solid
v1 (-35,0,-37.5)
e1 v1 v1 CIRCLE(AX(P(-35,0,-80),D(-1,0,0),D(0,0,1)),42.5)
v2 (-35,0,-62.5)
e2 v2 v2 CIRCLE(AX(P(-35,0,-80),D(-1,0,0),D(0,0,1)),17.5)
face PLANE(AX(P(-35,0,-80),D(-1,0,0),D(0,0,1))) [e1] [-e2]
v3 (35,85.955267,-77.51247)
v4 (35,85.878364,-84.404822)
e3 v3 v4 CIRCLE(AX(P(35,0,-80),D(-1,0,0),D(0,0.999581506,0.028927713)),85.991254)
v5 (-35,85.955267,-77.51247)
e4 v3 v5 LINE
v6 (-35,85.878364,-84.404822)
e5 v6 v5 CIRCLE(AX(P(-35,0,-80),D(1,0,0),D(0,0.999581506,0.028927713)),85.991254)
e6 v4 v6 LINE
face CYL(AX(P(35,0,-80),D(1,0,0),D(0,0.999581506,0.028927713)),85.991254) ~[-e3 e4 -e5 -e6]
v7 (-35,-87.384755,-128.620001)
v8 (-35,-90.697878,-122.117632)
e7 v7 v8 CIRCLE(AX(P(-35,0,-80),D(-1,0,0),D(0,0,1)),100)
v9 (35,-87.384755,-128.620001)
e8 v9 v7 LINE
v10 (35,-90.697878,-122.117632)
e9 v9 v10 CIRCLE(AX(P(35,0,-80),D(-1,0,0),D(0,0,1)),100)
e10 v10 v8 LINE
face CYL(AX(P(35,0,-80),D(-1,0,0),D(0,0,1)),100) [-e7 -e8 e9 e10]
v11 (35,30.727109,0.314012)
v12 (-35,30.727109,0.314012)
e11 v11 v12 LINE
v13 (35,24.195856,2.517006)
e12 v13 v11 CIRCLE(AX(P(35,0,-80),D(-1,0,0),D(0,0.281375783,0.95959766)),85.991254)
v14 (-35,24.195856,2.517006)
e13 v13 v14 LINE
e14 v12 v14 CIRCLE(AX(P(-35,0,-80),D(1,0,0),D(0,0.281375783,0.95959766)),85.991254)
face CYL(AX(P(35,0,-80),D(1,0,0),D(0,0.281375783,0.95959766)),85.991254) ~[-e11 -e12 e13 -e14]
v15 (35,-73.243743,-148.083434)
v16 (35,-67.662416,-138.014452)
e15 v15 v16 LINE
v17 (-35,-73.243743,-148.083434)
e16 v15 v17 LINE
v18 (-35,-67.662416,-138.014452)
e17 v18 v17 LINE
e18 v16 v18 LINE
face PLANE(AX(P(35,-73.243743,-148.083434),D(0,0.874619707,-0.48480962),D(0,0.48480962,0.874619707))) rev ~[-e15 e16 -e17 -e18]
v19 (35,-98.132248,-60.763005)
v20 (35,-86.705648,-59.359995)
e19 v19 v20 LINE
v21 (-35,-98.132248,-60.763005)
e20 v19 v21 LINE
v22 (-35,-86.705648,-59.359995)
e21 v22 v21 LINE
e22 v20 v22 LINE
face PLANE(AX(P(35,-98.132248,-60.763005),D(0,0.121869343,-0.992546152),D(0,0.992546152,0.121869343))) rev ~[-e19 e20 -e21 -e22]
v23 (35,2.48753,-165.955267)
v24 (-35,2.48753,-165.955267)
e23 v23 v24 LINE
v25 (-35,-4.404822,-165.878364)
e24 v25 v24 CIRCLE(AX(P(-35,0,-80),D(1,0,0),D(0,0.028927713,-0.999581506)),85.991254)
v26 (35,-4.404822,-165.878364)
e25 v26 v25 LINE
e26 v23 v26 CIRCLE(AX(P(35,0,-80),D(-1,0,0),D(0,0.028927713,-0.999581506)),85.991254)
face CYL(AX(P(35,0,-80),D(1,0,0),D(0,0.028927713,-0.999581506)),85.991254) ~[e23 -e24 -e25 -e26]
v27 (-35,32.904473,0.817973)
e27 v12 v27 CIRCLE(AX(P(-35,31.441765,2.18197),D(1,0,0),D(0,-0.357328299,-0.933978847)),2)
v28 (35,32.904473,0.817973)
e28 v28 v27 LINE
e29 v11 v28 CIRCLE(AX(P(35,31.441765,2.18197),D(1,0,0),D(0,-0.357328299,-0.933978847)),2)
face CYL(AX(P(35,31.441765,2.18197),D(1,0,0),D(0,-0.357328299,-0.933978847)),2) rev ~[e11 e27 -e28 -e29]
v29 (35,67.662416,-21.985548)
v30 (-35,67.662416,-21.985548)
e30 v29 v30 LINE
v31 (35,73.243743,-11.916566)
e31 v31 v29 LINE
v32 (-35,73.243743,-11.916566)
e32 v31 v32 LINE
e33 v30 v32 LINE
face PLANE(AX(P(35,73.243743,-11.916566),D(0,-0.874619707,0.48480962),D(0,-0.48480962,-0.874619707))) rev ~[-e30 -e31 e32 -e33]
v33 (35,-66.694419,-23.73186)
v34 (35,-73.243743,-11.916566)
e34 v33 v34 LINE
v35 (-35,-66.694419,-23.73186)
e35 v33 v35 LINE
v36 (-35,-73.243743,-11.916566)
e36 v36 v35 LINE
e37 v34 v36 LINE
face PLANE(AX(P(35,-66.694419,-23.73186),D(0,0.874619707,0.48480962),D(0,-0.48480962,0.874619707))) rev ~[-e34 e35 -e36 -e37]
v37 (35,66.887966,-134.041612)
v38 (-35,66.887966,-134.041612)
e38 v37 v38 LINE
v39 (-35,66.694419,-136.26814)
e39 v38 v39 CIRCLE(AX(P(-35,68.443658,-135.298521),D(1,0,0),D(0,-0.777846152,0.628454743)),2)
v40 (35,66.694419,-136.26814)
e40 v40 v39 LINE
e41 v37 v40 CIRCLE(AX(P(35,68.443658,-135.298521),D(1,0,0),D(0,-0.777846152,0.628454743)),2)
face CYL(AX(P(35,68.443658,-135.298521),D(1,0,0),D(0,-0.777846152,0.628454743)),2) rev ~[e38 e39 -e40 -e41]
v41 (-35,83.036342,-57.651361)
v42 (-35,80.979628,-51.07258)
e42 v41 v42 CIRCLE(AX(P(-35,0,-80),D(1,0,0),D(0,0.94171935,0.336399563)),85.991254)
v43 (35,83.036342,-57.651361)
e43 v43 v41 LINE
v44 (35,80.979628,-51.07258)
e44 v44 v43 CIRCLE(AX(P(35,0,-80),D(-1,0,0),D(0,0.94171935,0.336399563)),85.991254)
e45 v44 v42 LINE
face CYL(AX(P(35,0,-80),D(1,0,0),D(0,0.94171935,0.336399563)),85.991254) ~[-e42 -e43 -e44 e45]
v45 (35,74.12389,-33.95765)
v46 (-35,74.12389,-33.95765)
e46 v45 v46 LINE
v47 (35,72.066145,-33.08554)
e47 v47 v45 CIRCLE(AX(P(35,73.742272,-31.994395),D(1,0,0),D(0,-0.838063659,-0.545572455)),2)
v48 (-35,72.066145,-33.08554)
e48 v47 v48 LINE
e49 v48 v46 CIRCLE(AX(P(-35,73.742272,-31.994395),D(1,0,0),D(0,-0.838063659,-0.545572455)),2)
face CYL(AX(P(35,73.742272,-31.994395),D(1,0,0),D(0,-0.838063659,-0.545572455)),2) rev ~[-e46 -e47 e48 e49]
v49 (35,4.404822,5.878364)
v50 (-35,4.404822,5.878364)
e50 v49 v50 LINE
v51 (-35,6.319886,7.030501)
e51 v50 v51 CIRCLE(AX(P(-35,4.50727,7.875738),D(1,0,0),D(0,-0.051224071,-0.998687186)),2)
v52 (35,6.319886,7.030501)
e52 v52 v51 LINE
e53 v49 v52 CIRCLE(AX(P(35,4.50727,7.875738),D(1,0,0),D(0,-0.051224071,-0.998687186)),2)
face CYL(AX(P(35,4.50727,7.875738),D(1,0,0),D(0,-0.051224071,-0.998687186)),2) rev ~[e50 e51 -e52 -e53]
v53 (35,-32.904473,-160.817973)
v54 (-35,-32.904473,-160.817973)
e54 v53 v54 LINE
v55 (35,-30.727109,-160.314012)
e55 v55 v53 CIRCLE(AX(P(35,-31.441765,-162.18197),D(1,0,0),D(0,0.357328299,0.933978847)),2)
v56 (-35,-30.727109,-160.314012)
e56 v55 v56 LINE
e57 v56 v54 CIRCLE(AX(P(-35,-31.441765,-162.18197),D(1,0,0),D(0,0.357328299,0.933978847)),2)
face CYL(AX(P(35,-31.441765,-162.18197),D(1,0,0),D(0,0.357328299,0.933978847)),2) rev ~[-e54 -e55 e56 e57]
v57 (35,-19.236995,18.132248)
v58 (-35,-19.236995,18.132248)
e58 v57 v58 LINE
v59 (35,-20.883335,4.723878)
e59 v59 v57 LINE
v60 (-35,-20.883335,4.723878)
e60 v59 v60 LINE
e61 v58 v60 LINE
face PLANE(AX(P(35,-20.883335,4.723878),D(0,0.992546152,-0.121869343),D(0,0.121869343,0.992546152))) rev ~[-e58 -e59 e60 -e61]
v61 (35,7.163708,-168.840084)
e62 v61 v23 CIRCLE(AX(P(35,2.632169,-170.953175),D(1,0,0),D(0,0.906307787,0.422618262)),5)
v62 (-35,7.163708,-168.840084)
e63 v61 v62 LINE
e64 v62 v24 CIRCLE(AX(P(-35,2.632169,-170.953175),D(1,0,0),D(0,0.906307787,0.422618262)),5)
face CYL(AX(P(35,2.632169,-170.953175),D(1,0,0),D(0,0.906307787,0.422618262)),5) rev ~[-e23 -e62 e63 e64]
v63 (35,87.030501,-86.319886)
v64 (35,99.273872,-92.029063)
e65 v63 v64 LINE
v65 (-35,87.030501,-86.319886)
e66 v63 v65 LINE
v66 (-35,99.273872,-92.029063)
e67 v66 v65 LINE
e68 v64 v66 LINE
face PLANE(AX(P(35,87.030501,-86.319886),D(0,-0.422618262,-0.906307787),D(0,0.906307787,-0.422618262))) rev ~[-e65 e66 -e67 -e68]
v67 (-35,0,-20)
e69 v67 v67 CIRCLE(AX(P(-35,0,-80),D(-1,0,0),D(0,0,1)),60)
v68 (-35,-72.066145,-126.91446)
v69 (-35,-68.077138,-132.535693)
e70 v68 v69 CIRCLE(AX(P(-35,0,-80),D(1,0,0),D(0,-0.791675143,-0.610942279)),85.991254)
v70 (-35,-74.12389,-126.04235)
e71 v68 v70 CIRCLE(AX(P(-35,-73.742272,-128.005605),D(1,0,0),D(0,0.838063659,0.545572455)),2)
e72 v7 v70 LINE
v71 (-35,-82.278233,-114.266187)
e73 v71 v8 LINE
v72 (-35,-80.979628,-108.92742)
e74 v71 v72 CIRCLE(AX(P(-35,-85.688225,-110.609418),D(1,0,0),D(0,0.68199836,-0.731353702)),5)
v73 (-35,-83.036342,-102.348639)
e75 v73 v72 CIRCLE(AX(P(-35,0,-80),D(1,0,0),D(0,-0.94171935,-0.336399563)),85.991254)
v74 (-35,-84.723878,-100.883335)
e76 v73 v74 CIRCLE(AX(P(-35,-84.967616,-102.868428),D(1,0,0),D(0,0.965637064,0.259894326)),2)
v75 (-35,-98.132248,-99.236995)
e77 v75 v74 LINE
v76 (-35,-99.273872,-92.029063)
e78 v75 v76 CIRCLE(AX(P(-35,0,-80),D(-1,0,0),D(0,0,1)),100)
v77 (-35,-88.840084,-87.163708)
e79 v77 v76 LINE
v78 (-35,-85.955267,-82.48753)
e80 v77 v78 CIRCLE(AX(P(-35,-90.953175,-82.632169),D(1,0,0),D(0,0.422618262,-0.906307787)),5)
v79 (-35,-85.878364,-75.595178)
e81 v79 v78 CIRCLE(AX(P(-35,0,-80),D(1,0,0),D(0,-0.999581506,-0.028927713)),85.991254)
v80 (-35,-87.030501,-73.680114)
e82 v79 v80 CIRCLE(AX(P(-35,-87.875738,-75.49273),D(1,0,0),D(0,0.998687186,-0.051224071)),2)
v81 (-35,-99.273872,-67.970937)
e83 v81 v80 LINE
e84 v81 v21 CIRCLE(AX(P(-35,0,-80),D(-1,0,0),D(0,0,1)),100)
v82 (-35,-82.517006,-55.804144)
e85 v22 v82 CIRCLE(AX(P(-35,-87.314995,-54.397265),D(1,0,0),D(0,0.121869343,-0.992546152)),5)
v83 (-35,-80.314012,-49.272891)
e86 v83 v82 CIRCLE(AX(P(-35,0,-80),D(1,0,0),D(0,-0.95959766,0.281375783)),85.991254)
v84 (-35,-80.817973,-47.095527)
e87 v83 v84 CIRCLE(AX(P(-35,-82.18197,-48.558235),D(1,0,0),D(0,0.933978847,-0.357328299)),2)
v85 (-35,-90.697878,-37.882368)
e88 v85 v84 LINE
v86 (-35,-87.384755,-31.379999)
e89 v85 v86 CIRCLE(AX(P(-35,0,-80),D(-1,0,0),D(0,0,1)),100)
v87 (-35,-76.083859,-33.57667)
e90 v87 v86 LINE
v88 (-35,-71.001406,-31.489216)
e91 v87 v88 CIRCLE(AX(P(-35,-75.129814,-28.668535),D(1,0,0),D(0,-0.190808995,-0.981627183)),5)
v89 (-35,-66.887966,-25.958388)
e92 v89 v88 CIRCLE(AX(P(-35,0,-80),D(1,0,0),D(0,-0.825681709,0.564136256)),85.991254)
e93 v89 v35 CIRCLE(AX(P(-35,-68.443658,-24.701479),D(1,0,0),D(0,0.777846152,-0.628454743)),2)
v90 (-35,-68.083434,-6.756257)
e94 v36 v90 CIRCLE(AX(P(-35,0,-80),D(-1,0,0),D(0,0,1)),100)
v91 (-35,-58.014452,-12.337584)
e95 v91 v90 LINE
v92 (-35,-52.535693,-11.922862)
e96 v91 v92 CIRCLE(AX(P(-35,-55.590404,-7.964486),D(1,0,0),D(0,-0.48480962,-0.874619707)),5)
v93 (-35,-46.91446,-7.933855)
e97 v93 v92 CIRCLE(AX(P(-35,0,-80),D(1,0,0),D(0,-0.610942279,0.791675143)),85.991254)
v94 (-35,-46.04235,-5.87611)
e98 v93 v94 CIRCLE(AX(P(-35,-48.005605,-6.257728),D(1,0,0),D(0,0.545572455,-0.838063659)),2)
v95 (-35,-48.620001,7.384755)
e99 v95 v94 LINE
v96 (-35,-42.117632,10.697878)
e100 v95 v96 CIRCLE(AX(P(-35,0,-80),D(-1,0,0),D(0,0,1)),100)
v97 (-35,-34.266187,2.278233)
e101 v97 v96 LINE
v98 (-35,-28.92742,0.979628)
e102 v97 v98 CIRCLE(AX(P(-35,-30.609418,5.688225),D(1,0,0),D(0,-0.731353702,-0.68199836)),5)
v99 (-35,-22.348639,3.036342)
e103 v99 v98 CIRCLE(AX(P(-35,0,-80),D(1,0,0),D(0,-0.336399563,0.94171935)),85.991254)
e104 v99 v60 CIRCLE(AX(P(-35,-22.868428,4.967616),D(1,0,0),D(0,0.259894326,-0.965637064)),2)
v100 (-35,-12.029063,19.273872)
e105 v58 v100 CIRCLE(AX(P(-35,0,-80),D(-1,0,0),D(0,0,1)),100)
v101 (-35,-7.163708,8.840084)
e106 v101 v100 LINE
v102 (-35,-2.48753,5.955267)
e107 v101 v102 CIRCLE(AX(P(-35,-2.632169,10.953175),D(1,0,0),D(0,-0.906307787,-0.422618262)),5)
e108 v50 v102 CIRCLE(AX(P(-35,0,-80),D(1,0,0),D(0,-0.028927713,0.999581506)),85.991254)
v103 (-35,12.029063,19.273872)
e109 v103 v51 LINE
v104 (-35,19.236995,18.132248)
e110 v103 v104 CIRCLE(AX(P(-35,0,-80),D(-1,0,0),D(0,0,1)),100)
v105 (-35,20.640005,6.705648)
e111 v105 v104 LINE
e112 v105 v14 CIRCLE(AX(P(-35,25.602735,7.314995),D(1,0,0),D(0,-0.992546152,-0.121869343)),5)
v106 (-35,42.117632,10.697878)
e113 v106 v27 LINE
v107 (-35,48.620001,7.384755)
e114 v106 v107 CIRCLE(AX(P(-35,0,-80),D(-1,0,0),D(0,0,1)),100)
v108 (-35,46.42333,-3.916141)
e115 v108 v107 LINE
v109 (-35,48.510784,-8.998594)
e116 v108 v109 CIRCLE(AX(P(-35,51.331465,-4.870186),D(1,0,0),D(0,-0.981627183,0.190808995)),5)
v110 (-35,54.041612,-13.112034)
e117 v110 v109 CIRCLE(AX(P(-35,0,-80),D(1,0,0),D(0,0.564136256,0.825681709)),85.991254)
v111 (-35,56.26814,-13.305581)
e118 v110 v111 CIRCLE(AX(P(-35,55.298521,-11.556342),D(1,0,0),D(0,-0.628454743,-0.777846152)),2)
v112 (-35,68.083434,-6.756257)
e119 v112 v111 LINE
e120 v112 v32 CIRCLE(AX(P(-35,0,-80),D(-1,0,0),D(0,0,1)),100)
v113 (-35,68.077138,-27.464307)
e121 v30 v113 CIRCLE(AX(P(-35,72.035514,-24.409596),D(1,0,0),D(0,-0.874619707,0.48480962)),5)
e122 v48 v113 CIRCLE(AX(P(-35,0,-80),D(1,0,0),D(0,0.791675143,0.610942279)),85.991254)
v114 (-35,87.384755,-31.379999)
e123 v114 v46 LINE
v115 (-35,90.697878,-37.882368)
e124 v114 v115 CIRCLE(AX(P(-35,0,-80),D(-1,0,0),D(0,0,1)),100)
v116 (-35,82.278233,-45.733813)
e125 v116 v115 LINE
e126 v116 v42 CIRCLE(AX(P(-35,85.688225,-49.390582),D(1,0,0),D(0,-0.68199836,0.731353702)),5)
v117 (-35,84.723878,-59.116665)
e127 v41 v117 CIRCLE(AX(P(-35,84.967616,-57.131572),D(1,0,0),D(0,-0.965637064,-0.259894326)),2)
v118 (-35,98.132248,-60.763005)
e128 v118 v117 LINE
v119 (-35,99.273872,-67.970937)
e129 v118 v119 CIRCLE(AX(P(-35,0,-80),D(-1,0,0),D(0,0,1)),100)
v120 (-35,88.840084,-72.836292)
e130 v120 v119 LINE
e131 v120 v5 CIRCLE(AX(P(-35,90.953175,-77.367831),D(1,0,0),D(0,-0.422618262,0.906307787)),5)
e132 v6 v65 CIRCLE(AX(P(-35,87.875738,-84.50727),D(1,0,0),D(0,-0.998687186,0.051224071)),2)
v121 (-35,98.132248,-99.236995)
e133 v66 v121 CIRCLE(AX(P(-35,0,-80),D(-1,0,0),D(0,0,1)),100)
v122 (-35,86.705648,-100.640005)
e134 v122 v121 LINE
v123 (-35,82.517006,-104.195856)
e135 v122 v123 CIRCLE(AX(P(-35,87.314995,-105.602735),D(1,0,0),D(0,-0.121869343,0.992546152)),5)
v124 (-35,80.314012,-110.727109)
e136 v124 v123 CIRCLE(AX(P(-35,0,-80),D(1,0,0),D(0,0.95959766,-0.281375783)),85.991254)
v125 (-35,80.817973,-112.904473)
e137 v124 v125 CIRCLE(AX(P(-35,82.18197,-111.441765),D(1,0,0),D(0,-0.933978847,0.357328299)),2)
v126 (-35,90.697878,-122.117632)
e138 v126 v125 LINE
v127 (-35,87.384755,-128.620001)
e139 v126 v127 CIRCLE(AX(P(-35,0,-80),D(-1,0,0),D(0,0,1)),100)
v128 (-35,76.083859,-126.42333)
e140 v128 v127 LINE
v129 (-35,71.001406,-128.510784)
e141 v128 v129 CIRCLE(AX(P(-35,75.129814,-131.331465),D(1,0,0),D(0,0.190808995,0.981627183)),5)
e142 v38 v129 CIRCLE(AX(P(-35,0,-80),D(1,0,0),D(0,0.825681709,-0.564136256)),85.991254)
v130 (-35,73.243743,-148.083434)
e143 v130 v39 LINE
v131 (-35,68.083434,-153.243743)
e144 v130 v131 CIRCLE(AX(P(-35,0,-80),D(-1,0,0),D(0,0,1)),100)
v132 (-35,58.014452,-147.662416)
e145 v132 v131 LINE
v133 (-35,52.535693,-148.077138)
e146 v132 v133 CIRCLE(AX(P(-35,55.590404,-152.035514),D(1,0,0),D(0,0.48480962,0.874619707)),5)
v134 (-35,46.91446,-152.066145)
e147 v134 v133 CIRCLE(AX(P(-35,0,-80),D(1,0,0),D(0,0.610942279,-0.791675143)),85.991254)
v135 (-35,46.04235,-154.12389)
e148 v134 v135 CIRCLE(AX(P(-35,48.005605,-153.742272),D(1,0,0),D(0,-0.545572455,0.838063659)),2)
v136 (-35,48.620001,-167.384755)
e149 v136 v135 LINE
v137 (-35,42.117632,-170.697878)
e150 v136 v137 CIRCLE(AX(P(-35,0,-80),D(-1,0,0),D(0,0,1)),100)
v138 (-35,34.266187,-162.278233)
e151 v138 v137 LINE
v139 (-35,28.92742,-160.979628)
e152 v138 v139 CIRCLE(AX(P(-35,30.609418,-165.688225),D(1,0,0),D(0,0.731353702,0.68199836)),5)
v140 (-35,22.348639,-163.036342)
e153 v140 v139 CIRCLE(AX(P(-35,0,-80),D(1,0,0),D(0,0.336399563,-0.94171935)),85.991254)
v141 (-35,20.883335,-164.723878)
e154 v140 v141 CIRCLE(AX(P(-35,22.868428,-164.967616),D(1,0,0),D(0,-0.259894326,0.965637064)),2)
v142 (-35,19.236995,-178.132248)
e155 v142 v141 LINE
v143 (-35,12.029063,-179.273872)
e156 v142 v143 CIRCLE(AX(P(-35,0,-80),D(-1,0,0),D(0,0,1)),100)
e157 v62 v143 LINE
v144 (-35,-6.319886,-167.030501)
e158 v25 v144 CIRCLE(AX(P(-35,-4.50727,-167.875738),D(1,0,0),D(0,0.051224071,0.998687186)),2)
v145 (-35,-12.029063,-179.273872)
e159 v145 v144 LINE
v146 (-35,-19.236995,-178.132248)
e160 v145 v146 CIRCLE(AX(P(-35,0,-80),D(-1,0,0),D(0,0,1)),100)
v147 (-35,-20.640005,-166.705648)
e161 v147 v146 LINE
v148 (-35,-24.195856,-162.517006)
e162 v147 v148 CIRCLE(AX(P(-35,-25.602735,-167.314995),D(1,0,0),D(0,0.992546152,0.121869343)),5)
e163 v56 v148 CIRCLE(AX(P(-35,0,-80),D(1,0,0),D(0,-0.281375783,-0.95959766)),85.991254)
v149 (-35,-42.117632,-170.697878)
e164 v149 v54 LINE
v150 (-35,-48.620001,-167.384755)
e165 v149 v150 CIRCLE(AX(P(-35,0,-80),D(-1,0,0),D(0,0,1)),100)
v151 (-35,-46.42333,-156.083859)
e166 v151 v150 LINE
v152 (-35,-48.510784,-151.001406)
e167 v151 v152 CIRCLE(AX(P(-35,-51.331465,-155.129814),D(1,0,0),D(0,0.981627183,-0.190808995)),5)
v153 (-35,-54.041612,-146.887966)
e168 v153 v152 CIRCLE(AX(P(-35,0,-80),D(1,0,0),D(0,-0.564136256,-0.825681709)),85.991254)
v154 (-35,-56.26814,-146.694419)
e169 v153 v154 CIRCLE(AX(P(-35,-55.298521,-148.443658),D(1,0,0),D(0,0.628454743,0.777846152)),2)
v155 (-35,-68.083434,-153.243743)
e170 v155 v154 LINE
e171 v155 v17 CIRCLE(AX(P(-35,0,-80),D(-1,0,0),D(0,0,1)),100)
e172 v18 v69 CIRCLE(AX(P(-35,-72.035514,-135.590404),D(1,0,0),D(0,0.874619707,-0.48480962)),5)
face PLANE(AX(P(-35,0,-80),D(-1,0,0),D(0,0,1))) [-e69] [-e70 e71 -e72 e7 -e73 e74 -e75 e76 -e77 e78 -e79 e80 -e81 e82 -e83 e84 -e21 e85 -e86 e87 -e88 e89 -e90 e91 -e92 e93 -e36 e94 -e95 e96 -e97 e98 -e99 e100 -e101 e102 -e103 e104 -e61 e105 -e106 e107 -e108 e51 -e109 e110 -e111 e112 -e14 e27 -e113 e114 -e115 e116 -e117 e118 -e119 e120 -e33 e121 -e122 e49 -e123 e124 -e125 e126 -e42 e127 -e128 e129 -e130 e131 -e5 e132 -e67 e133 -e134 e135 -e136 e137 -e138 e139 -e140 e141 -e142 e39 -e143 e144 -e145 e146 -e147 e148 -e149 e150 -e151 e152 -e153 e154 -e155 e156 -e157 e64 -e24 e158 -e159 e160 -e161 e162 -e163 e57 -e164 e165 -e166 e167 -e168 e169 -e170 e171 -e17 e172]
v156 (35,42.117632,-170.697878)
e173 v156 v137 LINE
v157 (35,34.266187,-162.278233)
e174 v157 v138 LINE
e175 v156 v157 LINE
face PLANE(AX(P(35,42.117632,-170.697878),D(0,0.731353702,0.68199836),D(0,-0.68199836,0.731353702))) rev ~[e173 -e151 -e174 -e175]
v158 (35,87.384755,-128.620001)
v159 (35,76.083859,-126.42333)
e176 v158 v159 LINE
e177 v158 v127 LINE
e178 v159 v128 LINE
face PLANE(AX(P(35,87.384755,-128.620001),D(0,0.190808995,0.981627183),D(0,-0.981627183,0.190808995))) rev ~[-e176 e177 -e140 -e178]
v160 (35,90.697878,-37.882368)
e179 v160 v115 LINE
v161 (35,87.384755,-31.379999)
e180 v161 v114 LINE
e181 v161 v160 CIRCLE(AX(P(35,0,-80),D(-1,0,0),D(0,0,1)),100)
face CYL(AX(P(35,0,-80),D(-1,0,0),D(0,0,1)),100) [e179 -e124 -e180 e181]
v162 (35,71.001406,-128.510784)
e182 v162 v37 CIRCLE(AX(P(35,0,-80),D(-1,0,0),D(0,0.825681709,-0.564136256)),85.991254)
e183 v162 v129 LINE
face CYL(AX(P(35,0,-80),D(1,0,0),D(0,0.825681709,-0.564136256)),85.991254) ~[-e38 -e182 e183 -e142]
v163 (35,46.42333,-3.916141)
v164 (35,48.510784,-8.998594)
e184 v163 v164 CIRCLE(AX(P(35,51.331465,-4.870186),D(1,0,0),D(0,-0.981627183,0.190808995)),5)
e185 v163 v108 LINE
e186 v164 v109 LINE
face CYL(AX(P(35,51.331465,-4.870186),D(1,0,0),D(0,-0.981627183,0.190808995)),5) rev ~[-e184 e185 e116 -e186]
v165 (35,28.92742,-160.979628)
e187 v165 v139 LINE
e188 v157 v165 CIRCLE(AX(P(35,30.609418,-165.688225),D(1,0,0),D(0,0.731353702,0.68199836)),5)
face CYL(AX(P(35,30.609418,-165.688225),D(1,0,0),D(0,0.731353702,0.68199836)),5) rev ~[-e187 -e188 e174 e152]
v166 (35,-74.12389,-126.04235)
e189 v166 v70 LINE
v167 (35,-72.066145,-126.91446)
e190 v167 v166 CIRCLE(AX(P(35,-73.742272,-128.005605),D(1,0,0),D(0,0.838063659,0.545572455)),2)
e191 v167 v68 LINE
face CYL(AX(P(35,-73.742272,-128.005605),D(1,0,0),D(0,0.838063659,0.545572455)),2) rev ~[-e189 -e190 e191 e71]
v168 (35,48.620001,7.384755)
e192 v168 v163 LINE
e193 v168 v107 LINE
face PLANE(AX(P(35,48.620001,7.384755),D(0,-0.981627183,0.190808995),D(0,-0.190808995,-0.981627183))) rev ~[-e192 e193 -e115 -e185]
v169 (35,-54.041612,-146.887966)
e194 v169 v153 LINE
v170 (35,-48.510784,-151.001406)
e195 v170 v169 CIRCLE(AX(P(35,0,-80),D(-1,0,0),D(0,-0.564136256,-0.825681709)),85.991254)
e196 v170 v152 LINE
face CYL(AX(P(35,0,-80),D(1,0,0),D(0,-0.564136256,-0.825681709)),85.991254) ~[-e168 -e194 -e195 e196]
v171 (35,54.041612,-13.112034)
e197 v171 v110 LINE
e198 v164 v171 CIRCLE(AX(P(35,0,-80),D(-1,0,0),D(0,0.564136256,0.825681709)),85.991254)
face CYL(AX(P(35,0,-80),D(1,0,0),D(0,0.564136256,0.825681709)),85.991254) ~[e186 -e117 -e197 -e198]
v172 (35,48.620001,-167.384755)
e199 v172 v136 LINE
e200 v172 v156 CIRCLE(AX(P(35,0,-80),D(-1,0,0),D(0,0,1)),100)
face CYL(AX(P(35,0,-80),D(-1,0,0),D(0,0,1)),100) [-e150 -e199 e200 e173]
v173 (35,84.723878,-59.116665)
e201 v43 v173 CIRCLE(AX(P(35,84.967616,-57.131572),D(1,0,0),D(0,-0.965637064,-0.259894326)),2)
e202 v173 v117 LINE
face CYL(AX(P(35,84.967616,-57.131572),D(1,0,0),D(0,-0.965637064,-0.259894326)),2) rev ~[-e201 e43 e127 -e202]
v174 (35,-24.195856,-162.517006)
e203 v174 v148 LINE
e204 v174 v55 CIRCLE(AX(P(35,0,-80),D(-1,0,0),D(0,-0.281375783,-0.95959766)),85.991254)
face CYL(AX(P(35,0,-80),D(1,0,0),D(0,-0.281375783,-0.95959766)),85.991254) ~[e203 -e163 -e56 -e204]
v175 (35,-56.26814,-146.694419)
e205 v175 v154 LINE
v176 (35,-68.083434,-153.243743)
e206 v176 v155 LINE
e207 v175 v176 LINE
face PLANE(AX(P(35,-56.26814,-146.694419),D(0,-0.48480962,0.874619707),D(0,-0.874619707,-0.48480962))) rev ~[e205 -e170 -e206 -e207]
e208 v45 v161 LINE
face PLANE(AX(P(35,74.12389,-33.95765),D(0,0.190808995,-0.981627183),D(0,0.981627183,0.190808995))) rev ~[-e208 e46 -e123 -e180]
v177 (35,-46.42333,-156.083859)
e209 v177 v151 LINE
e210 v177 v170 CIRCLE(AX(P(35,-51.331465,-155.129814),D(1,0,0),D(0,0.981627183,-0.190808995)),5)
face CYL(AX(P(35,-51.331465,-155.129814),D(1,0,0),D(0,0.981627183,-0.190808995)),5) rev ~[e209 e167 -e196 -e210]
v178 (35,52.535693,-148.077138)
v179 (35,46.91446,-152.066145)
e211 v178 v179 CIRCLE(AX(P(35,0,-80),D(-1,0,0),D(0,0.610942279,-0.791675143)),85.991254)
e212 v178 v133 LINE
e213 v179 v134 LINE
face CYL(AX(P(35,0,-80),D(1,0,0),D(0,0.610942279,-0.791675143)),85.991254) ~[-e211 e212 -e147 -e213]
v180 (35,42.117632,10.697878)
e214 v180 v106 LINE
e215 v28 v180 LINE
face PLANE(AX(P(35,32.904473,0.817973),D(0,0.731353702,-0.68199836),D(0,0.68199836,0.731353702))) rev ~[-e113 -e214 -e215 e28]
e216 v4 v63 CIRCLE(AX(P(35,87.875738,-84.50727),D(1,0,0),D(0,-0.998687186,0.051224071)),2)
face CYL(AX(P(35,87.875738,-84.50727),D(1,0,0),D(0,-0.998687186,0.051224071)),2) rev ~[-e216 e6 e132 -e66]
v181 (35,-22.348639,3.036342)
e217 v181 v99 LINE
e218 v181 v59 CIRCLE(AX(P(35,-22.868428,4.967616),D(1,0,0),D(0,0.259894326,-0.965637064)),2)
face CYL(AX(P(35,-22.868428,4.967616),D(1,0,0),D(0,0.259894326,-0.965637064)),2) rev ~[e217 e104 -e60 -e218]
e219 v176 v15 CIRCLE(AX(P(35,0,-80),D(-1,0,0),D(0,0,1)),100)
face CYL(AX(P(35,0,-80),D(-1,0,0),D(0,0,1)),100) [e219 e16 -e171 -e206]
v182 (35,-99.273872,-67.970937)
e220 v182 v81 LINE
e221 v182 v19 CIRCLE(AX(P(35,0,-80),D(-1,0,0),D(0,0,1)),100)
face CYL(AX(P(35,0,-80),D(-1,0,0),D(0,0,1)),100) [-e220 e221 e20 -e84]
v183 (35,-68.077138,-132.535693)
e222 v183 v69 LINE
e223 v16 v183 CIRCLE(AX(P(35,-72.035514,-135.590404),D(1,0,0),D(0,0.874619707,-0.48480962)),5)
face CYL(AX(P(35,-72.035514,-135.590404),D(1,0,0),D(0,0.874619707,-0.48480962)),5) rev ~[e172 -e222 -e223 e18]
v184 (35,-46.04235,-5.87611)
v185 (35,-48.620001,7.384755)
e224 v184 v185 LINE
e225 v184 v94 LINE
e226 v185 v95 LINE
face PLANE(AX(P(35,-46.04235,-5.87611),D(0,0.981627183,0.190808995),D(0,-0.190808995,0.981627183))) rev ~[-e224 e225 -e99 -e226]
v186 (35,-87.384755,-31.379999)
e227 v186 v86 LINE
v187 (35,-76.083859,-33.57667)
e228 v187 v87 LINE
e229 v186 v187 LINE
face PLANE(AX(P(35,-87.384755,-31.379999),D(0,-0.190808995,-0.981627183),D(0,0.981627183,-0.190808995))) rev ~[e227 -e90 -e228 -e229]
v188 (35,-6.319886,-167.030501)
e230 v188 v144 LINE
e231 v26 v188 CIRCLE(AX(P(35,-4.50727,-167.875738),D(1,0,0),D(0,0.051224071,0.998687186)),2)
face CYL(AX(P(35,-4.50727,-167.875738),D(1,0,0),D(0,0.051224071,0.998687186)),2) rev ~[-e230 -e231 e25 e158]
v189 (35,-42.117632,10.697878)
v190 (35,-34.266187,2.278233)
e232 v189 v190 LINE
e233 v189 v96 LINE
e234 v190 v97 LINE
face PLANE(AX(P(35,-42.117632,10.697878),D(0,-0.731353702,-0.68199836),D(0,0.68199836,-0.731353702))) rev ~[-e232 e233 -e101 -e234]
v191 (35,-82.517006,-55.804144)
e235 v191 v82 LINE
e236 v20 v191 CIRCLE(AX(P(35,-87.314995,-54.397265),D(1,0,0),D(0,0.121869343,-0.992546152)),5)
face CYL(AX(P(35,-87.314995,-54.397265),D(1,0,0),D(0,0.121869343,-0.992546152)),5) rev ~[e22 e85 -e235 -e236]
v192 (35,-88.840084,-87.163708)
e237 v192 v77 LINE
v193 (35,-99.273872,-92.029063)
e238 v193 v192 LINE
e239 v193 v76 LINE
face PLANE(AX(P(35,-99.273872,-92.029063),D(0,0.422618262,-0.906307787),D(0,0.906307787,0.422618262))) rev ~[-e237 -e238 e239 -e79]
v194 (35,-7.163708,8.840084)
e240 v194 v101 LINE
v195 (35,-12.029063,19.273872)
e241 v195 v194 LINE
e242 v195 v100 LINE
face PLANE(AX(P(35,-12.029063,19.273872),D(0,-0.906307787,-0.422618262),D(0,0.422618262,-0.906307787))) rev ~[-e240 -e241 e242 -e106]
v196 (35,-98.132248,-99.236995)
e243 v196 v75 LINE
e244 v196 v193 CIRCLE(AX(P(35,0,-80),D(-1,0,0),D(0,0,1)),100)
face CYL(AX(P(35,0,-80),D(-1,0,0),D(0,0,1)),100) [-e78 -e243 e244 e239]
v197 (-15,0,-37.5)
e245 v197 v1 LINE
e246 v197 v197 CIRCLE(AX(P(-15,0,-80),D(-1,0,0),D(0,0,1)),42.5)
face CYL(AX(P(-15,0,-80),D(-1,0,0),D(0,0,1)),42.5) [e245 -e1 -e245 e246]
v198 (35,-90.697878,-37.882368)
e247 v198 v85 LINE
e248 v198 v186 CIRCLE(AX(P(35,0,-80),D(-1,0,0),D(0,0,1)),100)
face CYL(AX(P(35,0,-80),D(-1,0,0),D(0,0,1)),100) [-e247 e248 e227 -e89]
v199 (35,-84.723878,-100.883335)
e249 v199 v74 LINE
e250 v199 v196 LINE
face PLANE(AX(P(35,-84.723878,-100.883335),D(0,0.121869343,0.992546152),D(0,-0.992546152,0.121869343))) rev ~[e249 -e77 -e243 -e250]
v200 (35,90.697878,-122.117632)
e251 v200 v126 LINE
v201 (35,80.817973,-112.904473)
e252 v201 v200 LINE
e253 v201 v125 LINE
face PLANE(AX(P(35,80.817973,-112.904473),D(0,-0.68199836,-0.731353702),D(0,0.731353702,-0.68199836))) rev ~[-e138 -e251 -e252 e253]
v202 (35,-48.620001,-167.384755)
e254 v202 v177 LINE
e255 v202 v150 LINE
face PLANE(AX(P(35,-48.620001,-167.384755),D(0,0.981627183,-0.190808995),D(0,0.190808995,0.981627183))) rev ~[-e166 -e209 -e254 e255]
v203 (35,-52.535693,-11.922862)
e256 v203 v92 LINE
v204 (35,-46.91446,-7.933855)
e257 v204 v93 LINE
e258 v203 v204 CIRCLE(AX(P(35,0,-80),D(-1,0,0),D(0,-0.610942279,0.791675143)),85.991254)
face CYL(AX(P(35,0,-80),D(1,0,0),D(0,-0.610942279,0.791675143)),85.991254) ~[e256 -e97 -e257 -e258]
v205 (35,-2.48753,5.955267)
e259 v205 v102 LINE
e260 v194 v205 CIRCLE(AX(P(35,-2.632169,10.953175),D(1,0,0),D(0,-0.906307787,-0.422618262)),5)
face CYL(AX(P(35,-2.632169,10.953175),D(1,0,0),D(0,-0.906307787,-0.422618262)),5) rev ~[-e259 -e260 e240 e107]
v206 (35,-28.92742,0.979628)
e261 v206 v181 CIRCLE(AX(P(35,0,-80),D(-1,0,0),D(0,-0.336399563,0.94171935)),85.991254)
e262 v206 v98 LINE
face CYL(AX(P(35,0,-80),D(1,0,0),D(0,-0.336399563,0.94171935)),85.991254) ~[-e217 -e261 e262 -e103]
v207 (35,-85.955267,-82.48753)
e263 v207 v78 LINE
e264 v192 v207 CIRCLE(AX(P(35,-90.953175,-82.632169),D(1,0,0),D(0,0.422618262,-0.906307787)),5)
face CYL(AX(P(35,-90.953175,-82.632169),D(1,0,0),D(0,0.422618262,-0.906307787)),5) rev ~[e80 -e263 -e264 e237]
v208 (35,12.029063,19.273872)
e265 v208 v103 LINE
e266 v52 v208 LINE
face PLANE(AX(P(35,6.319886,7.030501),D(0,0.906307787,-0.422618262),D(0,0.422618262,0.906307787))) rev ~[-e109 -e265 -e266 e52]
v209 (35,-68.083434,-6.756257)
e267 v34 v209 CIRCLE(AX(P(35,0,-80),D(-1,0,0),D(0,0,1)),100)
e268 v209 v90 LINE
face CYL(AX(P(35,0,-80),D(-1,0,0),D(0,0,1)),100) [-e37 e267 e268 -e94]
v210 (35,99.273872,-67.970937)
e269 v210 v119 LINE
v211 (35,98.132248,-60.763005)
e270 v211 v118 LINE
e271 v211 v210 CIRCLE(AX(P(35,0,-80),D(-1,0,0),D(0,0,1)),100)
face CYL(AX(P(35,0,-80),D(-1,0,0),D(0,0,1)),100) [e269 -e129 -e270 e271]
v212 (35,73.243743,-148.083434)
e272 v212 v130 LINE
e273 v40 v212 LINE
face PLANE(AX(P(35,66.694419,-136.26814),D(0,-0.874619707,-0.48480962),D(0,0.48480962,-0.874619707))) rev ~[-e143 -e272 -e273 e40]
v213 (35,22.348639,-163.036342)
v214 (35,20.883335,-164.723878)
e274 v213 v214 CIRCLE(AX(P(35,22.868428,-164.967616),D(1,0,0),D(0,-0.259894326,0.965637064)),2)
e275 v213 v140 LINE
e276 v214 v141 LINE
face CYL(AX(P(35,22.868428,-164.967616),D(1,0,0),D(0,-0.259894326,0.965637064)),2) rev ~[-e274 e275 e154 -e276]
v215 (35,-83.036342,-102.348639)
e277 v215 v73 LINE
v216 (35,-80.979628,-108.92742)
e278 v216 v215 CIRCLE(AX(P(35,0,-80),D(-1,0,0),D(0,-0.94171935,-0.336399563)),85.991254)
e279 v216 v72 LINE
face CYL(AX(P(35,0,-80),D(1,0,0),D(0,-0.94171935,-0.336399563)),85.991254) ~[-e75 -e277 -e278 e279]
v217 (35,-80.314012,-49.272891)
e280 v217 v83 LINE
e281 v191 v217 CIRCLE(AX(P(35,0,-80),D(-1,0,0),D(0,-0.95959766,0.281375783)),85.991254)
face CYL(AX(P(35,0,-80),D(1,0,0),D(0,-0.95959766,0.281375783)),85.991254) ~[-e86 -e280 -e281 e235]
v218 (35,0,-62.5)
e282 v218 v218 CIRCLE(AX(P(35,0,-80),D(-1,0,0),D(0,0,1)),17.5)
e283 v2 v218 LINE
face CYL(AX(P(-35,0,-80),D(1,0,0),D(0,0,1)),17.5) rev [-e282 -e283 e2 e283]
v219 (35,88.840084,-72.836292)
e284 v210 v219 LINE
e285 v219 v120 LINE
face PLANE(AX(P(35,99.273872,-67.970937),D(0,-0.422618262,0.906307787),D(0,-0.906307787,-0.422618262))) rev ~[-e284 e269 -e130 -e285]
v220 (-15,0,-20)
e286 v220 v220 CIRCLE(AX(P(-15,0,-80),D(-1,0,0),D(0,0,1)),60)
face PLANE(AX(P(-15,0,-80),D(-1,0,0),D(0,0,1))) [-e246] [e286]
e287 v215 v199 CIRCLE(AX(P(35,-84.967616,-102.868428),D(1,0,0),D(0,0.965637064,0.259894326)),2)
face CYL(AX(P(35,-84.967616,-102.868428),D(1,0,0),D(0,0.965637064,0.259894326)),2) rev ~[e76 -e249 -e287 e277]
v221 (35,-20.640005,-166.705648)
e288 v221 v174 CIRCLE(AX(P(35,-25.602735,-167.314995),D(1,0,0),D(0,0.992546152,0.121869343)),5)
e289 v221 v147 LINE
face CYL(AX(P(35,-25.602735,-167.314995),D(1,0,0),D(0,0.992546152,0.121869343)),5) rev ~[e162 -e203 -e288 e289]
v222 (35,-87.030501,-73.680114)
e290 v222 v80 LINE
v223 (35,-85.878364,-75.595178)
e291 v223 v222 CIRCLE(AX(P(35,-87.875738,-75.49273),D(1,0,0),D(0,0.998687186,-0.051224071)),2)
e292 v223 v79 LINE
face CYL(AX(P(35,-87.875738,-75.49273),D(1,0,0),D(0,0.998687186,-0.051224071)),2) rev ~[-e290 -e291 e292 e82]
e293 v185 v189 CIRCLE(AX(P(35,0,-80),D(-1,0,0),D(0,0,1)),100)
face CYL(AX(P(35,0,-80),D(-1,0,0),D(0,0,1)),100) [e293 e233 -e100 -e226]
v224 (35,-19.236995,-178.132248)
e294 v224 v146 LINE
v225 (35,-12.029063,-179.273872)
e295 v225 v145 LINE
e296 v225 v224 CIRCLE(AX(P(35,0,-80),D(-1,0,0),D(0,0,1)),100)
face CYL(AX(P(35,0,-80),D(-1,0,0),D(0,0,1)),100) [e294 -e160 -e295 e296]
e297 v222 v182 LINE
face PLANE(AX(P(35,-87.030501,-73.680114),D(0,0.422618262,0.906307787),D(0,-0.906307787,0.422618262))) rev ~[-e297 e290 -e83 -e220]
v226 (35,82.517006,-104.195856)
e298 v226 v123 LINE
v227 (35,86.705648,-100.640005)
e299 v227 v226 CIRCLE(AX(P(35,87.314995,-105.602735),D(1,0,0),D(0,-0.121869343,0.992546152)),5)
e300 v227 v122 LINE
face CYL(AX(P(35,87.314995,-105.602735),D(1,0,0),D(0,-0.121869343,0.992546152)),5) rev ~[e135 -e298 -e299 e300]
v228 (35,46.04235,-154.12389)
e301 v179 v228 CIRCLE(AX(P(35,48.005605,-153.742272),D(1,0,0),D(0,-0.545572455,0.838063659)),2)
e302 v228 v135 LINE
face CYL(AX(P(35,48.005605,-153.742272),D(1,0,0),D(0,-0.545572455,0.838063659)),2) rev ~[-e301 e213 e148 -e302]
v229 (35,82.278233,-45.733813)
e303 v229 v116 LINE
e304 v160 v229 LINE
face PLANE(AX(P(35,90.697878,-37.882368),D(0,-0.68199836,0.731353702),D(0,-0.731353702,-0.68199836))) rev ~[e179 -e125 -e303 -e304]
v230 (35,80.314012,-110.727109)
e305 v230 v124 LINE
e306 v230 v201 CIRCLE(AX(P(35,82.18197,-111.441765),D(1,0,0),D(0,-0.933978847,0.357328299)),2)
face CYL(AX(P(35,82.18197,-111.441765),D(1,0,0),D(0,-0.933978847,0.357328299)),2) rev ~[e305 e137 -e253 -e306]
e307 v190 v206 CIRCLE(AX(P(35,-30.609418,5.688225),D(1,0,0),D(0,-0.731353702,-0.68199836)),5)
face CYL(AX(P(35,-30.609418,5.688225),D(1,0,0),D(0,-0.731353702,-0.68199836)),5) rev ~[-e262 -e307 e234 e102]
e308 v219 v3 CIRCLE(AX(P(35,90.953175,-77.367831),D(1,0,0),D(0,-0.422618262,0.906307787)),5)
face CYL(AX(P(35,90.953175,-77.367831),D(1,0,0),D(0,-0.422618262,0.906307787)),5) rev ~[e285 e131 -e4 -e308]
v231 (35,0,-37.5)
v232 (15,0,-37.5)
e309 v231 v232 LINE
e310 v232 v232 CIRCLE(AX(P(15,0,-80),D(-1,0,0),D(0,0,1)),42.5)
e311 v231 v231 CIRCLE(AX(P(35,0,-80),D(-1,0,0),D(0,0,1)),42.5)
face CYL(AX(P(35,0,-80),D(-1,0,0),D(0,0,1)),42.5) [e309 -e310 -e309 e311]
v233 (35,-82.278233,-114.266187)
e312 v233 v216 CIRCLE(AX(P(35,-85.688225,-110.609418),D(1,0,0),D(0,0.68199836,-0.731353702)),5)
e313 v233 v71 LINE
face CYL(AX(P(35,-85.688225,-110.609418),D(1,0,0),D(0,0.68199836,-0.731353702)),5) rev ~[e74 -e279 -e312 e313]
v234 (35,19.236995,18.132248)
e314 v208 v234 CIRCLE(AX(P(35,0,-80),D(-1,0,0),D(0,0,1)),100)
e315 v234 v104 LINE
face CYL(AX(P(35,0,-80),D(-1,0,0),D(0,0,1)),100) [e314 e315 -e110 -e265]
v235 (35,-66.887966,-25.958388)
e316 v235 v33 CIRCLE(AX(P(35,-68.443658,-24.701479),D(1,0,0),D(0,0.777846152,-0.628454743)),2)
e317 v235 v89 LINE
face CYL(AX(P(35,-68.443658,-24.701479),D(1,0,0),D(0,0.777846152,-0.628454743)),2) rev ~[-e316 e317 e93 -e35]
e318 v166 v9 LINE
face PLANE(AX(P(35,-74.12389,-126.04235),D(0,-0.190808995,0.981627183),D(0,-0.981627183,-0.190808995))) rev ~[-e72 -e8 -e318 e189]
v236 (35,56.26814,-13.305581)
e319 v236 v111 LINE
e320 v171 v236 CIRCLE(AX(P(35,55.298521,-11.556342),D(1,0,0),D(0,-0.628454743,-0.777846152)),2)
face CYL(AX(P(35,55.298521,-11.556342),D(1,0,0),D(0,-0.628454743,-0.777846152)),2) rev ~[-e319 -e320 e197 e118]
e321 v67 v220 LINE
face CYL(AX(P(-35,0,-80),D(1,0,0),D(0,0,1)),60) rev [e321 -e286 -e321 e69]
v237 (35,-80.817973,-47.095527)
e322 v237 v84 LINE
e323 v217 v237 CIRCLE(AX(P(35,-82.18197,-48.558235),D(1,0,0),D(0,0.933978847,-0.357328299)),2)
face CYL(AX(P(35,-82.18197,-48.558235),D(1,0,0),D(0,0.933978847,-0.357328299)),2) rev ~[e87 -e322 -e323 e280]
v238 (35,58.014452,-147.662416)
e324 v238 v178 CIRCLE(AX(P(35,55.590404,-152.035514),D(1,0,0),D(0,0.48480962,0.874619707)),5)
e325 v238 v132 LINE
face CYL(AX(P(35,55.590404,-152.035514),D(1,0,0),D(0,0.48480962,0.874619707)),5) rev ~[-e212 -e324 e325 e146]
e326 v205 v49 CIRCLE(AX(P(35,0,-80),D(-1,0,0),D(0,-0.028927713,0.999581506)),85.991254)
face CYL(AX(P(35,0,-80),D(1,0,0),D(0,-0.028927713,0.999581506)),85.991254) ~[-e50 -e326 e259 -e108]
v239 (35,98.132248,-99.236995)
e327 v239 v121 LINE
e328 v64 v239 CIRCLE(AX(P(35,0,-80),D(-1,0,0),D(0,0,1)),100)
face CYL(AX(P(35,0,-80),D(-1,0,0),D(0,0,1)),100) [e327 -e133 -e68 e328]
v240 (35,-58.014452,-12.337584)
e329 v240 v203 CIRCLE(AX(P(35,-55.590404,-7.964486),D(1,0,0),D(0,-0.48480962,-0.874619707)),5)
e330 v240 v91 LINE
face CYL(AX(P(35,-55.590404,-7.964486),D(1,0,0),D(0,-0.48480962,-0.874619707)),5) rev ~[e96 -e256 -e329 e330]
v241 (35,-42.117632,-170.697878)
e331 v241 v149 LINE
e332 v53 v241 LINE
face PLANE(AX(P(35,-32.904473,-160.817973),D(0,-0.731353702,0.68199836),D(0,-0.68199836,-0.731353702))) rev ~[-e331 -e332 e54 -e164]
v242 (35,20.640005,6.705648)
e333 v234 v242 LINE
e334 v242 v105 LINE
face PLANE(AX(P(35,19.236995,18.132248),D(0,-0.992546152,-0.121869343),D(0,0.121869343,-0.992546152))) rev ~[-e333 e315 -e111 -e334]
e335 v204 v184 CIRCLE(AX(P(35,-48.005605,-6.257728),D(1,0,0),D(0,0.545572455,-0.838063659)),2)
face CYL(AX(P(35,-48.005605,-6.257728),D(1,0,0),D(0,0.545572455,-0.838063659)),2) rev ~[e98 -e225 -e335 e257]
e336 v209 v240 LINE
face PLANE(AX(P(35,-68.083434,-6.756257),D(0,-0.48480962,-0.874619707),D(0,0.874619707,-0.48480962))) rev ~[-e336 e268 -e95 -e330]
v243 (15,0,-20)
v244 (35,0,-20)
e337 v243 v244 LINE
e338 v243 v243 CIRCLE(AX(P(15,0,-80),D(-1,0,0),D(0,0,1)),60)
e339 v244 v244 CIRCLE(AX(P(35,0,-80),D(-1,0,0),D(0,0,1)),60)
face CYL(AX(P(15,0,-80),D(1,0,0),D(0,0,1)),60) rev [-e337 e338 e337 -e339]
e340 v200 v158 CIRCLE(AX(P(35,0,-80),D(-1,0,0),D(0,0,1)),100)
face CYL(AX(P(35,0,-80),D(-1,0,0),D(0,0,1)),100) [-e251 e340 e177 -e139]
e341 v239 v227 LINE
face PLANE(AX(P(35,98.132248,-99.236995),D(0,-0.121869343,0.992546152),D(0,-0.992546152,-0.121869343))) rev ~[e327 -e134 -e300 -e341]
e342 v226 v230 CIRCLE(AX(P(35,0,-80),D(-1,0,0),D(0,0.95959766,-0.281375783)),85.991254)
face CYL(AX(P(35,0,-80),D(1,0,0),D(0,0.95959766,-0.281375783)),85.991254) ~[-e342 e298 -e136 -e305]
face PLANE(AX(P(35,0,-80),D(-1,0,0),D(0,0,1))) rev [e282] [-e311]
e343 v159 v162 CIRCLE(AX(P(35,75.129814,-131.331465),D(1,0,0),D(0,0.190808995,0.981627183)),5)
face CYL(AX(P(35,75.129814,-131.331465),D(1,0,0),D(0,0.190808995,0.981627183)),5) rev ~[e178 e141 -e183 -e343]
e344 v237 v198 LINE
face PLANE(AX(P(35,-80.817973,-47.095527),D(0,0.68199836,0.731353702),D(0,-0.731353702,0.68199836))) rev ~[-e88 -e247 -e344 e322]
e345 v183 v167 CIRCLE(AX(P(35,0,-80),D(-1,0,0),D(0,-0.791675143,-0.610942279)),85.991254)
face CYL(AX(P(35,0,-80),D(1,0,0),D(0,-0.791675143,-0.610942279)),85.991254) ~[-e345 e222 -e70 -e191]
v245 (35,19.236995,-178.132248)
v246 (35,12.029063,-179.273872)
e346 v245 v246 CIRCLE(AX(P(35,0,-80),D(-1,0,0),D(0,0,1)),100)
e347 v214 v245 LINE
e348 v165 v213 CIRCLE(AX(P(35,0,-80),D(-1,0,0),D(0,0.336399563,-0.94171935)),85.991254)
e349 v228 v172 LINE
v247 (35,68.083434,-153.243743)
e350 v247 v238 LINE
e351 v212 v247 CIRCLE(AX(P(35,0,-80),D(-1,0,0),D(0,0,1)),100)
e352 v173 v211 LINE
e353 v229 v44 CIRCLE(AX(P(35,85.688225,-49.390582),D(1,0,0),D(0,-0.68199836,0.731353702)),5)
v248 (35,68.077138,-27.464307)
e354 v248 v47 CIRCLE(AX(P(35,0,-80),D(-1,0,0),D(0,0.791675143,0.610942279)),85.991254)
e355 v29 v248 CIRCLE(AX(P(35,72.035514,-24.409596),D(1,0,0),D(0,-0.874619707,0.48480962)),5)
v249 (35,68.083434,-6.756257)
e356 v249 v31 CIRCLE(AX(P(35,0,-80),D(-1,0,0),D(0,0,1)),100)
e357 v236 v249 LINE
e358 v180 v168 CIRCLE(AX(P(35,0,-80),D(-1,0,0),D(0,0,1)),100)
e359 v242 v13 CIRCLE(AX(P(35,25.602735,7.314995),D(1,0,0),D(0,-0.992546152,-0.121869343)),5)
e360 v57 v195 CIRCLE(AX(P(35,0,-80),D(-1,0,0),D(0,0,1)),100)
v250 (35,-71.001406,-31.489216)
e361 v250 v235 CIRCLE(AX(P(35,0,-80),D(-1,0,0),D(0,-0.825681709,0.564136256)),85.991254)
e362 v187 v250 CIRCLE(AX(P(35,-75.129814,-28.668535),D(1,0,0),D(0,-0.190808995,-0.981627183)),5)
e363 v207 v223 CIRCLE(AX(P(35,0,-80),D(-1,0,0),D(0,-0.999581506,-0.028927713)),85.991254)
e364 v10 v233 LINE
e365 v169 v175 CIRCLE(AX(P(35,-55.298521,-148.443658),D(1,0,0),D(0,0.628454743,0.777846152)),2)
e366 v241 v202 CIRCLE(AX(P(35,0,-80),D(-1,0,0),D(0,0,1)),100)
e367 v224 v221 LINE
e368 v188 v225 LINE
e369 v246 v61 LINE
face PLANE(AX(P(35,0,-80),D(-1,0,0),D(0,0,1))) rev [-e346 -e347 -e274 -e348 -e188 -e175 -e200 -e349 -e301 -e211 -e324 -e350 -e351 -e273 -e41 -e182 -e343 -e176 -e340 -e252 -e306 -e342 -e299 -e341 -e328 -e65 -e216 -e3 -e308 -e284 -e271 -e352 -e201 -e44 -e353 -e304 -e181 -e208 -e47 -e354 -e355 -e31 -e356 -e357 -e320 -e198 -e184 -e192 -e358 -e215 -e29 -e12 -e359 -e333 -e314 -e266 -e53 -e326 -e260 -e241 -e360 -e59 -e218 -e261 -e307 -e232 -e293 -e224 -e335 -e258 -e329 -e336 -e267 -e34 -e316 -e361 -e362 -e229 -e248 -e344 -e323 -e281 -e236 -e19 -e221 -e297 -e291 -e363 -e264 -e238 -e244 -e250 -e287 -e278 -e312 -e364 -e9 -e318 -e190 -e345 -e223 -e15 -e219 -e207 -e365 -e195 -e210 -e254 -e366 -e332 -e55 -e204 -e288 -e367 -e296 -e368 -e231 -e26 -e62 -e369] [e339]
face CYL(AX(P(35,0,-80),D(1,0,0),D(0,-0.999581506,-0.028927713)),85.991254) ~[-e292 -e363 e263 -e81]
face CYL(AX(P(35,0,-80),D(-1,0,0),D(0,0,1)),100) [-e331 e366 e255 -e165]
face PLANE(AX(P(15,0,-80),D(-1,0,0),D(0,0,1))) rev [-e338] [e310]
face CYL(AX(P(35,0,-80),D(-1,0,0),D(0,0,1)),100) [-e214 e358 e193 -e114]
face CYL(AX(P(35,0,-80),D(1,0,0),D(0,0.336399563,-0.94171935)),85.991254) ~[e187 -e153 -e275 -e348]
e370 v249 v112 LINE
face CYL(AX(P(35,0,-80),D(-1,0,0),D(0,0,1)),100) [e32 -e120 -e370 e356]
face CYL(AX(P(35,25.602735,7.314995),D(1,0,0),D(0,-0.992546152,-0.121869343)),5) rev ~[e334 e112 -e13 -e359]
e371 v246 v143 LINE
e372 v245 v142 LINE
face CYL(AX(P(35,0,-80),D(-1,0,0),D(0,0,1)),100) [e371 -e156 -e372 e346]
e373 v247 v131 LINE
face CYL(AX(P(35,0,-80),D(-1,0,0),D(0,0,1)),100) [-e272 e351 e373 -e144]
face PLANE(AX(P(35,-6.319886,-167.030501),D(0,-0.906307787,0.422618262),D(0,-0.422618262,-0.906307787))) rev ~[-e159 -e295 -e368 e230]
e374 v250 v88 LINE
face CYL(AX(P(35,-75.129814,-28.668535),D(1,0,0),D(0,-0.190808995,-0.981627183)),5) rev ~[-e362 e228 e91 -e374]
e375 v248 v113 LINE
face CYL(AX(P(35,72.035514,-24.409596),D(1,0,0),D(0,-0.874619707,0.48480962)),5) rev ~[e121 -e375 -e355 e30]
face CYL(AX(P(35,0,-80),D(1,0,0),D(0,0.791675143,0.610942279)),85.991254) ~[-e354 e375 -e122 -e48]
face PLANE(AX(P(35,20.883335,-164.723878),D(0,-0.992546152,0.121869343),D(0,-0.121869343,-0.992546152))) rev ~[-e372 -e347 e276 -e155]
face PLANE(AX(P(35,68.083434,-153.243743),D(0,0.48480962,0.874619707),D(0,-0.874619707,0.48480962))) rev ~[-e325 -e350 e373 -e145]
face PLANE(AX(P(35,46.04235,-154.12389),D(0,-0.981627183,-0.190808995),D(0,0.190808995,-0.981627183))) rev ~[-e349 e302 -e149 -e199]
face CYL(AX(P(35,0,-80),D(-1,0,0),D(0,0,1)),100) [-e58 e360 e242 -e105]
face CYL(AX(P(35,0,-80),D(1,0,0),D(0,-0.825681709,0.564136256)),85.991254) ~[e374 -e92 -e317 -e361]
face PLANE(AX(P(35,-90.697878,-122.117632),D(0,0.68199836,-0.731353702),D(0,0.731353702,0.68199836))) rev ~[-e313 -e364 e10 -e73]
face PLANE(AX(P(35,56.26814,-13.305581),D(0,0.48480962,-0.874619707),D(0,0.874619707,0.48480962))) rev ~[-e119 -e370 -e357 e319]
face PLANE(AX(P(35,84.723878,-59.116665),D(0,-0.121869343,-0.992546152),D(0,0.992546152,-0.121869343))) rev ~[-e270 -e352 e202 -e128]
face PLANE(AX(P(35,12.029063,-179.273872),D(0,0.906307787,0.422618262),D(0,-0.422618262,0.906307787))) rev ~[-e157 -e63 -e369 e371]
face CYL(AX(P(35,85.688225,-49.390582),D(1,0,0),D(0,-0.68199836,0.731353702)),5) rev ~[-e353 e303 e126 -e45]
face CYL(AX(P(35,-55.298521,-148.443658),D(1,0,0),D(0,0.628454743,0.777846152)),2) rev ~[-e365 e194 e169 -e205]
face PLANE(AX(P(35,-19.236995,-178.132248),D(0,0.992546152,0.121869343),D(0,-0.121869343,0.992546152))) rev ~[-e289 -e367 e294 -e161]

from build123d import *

# Parameters (mm, degrees)
F3_DEPTH        = 70.001
F3_COPIES_COUNT = 20


# Not quite as in the source:
# - a feature of the source that left no trace in its solid (it failed there, or was rolled back) is left out
# - a pattern or mirror of a feature is missing from the dataset's text; its kind, count and spacing are read off the source's solid


with BuildPart() as f1:
    # F0 (on Front) → F1 (revolve)
    with BuildSketch(Plane.XZ):
        Polygon((35, -20), (35, 20), (-35, 20), (-35, -20), (-15, -20), (-15, -37.5), (-35, -37.5), (-35, -62.5), (35, -62.5), (35, -37.5), (15, -37.5), (15, -20), align=None)
    revolve(axis=Axis((-7.5, 0, -80), (-1, 0, 0)))

    # F2 (on face) → F3 (cut, through all)
    with BuildSketch(Plane.YZ.offset(35)):
        with BuildLine():
            ThreePointArc((-2.4875303205, 5.9552673354), (0.9594167449, 5.9859018055), (4.4048221019, 5.878363585))
            ThreePointArc((4.4048221019, 5.878363585), (5.5383005859, 6.1619770528), (6.3198858178, 7.0305014326))
            Line((6.3198858178, 7.0305014326), (12.0290632191, 19.2738718801))
            ThreePointArc((12.0290632191, 19.2738718801), (0, 20), (-12.0290632191, 19.2738718801))
            Line((-12.0290632191, 19.2738718801), (-7.1637078206, 8.8400835574))
            ThreePointArc((-7.1637078206, 8.8400835574), (-5.2573859952, 6.6977976646), (-2.4875303205, 5.9552673354))
        make_face()
    f3 = extrude(amount=-F3_DEPTH, mode=Mode.SUBTRACT)

    # F3_copies: F3 ×20 about axis
    f3_copies_axis = Axis((0, 0, -80), (1, 0, 0))
    for i in range(1, F3_COPIES_COUNT):
        add(f3.rotate(f3_copies_axis, i * 360 / F3_COPIES_COUNT), mode=Mode.SUBTRACT)


solid = f1.part
